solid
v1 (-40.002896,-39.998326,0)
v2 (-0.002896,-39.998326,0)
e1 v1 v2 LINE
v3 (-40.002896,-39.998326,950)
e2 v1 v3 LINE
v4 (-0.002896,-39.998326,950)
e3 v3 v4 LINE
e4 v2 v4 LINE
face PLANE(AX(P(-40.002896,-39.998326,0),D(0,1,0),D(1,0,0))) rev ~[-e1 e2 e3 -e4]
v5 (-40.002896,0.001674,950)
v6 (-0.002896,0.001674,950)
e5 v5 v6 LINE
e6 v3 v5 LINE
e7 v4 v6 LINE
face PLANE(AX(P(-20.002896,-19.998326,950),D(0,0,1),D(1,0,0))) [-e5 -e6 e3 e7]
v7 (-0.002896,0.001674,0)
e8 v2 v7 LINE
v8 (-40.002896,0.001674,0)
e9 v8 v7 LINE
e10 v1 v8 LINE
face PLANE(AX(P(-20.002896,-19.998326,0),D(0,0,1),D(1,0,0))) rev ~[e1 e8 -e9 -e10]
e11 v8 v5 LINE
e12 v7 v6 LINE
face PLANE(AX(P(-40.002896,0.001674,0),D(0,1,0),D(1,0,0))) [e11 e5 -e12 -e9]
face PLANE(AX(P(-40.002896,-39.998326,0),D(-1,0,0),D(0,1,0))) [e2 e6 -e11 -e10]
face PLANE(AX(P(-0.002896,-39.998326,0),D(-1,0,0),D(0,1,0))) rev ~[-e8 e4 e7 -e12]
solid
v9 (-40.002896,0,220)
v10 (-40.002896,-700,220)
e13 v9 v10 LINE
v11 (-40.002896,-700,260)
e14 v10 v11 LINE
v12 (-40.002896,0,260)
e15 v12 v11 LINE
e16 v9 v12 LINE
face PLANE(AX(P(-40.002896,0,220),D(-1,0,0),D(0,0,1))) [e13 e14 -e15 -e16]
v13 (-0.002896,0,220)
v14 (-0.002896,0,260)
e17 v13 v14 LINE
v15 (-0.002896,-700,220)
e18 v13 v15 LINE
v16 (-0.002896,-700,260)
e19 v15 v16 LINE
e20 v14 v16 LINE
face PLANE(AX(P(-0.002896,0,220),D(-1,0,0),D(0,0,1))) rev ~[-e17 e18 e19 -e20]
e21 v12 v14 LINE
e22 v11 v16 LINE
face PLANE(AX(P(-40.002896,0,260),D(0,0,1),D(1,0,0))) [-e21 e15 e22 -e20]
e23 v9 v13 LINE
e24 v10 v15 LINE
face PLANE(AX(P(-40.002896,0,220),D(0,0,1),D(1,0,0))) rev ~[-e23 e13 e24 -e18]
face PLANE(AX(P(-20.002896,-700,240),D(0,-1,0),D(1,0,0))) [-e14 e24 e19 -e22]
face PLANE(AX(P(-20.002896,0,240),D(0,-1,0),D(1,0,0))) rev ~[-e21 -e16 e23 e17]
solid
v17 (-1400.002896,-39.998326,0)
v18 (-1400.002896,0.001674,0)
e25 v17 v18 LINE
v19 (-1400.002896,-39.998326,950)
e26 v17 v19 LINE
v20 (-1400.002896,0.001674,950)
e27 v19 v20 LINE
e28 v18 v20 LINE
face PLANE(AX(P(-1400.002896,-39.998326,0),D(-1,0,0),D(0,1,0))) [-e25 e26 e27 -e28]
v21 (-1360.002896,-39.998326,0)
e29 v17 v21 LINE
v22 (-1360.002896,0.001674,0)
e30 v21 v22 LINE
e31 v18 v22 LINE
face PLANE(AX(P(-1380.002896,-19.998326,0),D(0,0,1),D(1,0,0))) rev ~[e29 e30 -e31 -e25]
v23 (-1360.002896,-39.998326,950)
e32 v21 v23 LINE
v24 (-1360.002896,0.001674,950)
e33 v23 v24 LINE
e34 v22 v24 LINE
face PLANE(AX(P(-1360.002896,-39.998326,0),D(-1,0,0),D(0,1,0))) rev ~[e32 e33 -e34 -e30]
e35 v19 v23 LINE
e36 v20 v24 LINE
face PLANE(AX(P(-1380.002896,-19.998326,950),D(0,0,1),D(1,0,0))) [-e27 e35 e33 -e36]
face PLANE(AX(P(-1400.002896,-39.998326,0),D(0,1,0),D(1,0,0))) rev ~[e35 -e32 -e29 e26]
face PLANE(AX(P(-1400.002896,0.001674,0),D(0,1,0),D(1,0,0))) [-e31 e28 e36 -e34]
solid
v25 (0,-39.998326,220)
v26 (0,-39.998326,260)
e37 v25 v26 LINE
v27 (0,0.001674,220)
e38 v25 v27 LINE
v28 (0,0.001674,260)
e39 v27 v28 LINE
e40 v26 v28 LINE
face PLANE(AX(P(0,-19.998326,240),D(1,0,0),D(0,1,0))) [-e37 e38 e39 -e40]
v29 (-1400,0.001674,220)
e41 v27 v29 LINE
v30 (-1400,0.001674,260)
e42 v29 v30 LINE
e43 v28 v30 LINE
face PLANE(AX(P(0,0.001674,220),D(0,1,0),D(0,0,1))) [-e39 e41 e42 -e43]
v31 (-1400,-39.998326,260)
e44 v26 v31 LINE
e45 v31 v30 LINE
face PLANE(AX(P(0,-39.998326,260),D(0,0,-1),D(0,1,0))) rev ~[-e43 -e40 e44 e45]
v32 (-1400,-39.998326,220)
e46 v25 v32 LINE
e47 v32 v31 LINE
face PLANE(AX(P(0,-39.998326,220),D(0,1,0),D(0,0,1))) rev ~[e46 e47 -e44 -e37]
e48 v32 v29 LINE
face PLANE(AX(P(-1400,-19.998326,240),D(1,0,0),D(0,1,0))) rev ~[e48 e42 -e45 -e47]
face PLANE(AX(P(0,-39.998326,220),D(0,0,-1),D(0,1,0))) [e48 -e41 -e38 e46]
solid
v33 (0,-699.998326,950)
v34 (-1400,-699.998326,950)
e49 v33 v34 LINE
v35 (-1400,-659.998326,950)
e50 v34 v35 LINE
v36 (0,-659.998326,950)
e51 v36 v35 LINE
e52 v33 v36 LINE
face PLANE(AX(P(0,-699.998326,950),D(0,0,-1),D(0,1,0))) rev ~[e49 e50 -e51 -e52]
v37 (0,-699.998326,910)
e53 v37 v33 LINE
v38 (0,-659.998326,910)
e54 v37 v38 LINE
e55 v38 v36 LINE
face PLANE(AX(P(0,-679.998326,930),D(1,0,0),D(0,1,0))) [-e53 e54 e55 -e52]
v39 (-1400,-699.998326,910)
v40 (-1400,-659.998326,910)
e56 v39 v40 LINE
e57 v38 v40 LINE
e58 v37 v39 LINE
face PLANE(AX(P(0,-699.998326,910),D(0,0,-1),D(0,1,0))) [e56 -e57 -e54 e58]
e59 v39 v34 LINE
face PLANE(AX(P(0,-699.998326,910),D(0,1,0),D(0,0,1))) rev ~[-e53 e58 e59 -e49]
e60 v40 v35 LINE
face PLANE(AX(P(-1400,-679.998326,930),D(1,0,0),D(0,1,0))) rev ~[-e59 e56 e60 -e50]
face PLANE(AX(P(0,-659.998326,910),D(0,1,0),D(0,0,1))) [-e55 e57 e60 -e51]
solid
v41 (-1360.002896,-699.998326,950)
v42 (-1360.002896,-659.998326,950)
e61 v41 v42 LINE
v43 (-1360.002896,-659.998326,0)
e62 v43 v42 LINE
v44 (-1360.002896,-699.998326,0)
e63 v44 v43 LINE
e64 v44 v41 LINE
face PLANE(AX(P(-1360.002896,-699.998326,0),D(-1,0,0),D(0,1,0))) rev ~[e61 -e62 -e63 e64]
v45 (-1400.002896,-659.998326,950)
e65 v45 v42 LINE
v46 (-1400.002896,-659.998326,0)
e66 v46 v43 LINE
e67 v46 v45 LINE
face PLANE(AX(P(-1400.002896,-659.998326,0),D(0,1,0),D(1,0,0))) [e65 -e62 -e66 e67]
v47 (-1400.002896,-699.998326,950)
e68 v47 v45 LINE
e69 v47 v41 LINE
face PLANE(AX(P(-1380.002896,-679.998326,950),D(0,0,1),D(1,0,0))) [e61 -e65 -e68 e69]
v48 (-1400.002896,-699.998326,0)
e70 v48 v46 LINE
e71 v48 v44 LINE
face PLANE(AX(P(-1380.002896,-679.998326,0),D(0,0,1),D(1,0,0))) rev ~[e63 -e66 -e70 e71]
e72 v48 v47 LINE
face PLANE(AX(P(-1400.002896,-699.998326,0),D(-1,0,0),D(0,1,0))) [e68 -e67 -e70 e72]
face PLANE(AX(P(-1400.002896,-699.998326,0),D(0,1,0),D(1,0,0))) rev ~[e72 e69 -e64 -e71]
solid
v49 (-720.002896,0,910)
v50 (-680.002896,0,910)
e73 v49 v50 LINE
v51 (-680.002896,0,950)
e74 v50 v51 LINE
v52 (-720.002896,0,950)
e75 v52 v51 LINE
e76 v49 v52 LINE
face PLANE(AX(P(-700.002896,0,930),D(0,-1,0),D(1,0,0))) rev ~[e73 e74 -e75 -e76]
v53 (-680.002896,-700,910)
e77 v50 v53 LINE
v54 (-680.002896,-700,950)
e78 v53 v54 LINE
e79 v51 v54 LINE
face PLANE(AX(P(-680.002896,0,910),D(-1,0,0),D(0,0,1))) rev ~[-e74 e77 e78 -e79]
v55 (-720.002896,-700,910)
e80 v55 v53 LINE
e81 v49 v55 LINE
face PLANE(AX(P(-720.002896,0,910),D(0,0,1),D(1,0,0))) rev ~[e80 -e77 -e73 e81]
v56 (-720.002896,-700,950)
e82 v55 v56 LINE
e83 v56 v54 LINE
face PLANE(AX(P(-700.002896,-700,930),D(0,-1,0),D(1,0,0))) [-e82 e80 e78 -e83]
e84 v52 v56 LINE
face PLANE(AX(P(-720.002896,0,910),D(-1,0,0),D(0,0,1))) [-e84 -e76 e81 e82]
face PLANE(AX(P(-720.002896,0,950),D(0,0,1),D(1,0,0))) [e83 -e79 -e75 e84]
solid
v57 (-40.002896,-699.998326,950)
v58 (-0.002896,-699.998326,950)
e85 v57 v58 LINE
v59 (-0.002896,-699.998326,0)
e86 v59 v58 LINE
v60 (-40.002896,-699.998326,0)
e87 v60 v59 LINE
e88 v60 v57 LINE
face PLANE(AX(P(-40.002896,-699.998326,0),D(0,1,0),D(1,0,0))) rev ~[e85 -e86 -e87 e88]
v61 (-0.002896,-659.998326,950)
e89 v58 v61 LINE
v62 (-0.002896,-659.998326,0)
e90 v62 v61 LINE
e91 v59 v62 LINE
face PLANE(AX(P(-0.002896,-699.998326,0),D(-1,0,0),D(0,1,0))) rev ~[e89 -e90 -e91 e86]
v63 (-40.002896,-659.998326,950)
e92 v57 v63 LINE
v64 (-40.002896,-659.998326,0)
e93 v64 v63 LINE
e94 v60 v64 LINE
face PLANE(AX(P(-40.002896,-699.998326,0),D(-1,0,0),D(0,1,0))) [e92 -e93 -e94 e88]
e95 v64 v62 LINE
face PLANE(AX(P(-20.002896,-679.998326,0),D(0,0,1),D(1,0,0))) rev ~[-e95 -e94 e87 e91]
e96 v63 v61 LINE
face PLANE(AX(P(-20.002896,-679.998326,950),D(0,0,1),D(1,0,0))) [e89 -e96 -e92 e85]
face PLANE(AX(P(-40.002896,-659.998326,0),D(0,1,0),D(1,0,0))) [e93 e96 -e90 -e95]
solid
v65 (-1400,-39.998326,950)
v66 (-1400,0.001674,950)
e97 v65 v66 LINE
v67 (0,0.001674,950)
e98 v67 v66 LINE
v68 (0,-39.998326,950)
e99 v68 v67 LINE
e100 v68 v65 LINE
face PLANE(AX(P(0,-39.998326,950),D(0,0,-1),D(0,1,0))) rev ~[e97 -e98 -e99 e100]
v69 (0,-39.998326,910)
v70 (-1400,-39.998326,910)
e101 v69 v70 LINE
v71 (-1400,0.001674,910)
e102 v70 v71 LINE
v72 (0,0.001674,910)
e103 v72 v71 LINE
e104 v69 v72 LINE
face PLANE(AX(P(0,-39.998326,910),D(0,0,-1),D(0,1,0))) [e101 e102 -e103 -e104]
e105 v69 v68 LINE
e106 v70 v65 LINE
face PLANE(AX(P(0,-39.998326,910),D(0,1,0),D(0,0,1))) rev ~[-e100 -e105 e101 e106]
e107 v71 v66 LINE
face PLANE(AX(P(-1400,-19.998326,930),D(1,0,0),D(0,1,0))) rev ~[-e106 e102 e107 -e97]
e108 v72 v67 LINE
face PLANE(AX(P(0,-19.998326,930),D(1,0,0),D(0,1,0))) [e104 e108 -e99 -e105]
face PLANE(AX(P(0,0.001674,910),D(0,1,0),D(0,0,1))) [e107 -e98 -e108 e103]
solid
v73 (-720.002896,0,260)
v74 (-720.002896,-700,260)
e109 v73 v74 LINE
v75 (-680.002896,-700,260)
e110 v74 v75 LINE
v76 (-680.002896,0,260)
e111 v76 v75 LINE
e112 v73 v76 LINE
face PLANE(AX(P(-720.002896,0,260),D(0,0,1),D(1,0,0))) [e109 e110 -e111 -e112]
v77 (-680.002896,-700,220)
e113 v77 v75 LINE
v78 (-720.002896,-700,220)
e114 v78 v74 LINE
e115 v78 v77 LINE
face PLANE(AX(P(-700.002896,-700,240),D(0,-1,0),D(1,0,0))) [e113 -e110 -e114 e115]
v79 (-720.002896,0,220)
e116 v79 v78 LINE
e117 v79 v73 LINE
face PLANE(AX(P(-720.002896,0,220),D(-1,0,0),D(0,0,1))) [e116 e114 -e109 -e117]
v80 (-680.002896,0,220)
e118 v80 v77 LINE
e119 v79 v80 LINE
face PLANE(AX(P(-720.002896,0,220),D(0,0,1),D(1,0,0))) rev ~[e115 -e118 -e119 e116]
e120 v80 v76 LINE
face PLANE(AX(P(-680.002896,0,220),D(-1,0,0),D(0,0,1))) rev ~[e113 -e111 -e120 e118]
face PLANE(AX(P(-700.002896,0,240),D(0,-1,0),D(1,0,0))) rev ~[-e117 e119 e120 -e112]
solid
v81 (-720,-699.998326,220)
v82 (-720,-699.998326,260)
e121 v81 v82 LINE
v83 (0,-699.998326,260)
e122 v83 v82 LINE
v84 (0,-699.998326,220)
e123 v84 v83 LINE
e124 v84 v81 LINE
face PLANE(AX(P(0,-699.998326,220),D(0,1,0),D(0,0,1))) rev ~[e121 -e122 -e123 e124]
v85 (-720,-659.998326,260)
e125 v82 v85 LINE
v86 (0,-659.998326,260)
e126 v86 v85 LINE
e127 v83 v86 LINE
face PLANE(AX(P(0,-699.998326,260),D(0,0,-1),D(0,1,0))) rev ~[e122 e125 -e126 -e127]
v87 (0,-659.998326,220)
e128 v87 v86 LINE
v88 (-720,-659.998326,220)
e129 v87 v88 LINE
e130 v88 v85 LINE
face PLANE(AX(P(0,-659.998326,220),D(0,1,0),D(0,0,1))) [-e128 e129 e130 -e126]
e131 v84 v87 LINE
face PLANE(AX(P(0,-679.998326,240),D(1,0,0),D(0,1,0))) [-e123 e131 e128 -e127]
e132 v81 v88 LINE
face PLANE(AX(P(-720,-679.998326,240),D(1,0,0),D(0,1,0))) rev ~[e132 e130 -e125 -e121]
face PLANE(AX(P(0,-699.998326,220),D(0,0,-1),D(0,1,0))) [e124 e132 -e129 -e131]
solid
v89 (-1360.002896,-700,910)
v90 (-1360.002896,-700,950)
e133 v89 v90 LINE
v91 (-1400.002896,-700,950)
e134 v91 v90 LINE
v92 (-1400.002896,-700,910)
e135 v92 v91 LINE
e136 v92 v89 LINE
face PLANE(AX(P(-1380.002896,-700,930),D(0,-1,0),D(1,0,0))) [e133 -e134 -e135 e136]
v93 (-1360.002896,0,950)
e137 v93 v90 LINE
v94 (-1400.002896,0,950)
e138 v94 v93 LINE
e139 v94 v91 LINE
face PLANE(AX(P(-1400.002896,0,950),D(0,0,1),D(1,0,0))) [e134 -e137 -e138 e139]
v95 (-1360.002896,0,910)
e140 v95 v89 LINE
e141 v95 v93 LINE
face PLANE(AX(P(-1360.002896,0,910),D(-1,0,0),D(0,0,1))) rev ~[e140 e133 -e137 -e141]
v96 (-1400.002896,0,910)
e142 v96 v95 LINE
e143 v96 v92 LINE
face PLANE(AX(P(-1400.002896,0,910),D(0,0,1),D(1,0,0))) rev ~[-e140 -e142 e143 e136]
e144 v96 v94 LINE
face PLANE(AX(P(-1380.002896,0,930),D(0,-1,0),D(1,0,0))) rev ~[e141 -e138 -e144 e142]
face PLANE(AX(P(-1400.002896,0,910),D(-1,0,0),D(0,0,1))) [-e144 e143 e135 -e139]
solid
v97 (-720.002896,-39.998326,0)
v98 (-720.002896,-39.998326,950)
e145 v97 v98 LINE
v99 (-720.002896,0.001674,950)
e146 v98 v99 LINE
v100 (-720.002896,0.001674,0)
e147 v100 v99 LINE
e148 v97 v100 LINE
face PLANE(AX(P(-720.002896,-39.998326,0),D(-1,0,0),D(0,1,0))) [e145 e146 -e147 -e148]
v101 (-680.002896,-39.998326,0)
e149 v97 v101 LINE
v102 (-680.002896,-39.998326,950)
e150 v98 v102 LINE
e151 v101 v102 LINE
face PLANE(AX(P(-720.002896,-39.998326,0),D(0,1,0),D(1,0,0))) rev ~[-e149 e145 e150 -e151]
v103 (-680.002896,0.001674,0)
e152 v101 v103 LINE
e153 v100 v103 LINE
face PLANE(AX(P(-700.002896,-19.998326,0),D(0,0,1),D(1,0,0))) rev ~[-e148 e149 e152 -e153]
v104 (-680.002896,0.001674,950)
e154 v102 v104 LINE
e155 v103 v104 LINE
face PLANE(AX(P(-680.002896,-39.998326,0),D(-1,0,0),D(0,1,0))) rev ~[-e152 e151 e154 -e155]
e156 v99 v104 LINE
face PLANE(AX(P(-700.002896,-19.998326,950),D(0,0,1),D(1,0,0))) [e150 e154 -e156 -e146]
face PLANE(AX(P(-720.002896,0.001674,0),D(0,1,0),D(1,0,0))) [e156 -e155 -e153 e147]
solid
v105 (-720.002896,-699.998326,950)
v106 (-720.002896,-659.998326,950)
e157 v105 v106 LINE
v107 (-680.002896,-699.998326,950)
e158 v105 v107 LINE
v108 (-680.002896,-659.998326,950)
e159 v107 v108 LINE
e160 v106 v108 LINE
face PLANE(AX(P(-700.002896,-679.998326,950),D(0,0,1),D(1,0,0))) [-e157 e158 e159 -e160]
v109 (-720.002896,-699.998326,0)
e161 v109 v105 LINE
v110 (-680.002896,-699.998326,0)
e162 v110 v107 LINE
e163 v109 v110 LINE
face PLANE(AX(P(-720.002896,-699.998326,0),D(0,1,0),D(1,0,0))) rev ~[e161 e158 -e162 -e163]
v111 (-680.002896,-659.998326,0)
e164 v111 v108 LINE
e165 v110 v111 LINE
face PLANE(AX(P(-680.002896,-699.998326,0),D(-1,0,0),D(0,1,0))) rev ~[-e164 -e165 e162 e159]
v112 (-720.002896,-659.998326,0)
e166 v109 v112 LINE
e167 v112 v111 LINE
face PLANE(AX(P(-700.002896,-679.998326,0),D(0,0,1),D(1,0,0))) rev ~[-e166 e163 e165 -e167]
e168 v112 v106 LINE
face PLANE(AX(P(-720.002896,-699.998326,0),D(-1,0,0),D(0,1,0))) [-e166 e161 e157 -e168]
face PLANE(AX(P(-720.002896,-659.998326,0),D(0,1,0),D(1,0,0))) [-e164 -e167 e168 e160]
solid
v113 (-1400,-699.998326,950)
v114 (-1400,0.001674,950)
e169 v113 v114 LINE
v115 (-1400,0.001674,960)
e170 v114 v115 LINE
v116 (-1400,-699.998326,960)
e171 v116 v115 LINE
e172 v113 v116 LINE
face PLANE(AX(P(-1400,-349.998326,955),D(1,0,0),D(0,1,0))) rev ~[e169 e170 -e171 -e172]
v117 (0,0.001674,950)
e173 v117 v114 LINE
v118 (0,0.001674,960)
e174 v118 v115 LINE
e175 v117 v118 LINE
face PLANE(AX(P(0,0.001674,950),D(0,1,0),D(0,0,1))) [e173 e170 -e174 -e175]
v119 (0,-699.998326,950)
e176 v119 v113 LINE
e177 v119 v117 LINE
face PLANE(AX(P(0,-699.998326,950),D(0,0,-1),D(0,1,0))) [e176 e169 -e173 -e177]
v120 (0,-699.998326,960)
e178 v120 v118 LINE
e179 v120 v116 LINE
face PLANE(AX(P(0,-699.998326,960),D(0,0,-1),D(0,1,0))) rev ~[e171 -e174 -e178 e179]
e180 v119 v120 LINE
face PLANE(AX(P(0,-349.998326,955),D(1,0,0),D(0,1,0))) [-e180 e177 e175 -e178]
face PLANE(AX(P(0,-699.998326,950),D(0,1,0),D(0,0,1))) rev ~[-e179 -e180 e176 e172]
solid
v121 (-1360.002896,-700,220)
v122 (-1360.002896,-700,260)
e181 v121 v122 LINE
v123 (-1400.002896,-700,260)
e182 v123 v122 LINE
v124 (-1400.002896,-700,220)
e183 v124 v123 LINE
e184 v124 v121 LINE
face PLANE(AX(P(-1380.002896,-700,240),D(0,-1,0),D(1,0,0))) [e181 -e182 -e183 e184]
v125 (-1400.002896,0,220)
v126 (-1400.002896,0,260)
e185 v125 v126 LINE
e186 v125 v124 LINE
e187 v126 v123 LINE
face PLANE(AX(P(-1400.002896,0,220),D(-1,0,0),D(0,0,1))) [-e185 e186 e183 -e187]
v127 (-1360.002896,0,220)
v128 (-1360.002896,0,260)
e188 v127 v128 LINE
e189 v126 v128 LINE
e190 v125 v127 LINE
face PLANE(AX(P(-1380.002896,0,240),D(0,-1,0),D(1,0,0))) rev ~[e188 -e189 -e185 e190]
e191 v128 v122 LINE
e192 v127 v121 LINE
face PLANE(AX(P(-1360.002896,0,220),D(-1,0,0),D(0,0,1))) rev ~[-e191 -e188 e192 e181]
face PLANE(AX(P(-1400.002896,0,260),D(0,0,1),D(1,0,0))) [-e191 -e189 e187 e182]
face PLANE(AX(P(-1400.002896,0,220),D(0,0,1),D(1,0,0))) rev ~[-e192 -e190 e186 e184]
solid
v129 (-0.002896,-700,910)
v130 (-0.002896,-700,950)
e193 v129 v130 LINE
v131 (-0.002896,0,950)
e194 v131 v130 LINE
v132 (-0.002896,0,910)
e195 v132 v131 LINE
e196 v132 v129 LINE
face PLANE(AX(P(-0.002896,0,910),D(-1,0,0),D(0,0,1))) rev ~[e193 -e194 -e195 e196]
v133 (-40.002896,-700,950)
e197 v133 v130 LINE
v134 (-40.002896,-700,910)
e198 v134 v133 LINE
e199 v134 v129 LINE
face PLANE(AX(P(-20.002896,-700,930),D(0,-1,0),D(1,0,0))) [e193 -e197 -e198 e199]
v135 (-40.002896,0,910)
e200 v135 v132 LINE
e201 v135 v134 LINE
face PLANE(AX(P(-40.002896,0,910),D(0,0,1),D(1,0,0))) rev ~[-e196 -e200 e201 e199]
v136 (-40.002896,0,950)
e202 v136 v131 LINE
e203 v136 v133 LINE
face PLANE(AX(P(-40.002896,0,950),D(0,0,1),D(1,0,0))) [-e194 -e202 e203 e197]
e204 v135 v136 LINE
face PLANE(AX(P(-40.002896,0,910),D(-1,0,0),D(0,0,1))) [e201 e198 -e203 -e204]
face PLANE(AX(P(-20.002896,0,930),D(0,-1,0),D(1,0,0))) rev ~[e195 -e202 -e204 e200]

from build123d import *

# Parameters (mm, degrees)
F0_W     = 40
F0_H     = 40
F1_DEPTH = 950
F2_W     = 40
F2_H     = 40
F3_DEPTH = 720
F2_W_2   = 700
F2_H_2   = 10
F4_DEPTH = 1400
F5_W     = 40
F5_H     = 40
F6_DEPTH = 700
F7_W     = 40
F7_H     = 40
F8_DEPTH = 1400


# Not quite as in the source:
# - a feature names something its author has since deleted; it is built from what else it names


with BuildPart() as f1:
    # F0 (on Top) → F1 (new body)
    with BuildSketch(Plane.XY):
        with Locations((-1380.0028958117, -19.9983263365)):
            Rectangle(F0_W, F0_H)
    extrude(amount=F1_DEPTH)


with BuildPart() as f1b:
    # F0 (on Top) → F1, piece 2 (new body)
    with BuildSketch(Plane.XY):
        with Locations((-700.0028958117, -19.9983263365)):
            Rectangle(F0_W, F0_H)
    extrude(amount=F1_DEPTH)


with BuildPart() as f1c:
    # F0 (on Top) → F1, piece 3 (new body)
    with BuildSketch(Plane.XY):
        with Locations((-1380.0028958117, -679.9983263365)):
            Rectangle(F0_W, F0_H)
    extrude(amount=F1_DEPTH)


with BuildPart() as f1d:
    # F0 (on Top) → F1, piece 4 (new body)
    with BuildSketch(Plane.XY):
        with Locations((-700.0028958117, -679.9983263365)):
            Rectangle(F0_W, F0_H)
    extrude(amount=F1_DEPTH)


with BuildPart() as f1e:
    # F0 (on Top) → F1, piece 5 (new body)
    with BuildSketch(Plane.XY):
        with Locations((-20.0028958117, -679.9983263365)):
            Rectangle(F0_W, F0_H)
    extrude(amount=F1_DEPTH)


with BuildPart() as f1f:
    # F0 (on Top) → F1, piece 6 (new body)
    with BuildSketch(Plane.XY):
        with Locations((-20.0028958117, -19.9983263365)):
            Rectangle(F0_W, F0_H)
    extrude(amount=F1_DEPTH)


with BuildPart() as f3:
    # F2 (on Right) → F3 (new body)
    with BuildSketch(Plane.YZ):
        with Locations((-679.9983263365, 240)):
            Rectangle(F2_W, F2_H)
    extrude(amount=-F3_DEPTH)


with BuildPart() as f4:
    # F2 (on Right) → F4 (new body)
    with BuildSketch(Plane.YZ):
        with Locations((-349.9983263365, 955)):
            Rectangle(F2_W_2, F2_H_2)
    extrude(amount=-F4_DEPTH)


with BuildPart() as f4b:
    # F2 (on Right) → F4, piece 2 (new body)
    with BuildSketch(Plane.YZ):
        with Locations((-19.9983263365, 240)):
            Rectangle(F2_W, F2_H)
    extrude(amount=-F4_DEPTH)


with BuildPart() as f6:
    # F5 (on Front) → F6 (new body)
    with BuildSketch(Plane.XZ):
        with Locations((-20.0028958117, 240)):
            Rectangle(F5_W, F5_H)
    extrude(amount=F6_DEPTH)


with BuildPart() as f6b:
    # F5 (on Front) → F6, piece 2 (new body)
    with BuildSketch(Plane.XZ):
        with Locations((-700.0028958117, 240)):
            Rectangle(F5_W, F5_H)
    extrude(amount=F6_DEPTH)


with BuildPart() as f6c:
    # F5 (on Front) → F6, piece 3 (new body)
    with BuildSketch(Plane.XZ):
        with Locations((-1380.0028958117, 240)):
            Rectangle(F5_W, F5_H)
    extrude(amount=F6_DEPTH)


with BuildPart() as f6d:
    # F5 (on Front) → F6, piece 4 (new body)
    with BuildSketch(Plane.XZ):
        with Locations((-20.0028958117, 930)):
            Rectangle(F5_W, F5_H)
    extrude(amount=F6_DEPTH)


with BuildPart() as f6e:
    # F5 (on Front) → F6, piece 5 (new body)
    with BuildSketch(Plane.XZ):
        with Locations((-700.0028958117, 930)):
            Rectangle(F5_W, F5_H)
    extrude(amount=F6_DEPTH)


with BuildPart() as f6f:
    # F5 (on Front) → F6, piece 6 (new body)
    with BuildSketch(Plane.XZ):
        with Locations((-1380.0028958117, 930)):
            Rectangle(F5_W, F5_H)
    extrude(amount=F6_DEPTH)


with BuildPart() as f8:
    # F7 (on Right) → F8 (new body)
    with BuildSketch(Plane.YZ):
        with Locations((-679.9983263365, 930)):
            Rectangle(F7_W, F7_H)
    extrude(amount=-F8_DEPTH)


with BuildPart() as f8b:
    # F7 (on Right) → F8, piece 2 (new body)
    with BuildSketch(Plane.YZ):
        with Locations((-19.9983263365, 930)):
            Rectangle(F7_W, F7_H)
    extrude(amount=-F8_DEPTH)


solid = Compound([f1.part, f1b.part, f1c.part, f1d.part, f1e.part, f1f.part, f3.part, f4.part, f4b.part, f6.part, f6b.part, f6c.part, f6d.part, f6e.part, f6f.part, f8.part, f8b.part])
